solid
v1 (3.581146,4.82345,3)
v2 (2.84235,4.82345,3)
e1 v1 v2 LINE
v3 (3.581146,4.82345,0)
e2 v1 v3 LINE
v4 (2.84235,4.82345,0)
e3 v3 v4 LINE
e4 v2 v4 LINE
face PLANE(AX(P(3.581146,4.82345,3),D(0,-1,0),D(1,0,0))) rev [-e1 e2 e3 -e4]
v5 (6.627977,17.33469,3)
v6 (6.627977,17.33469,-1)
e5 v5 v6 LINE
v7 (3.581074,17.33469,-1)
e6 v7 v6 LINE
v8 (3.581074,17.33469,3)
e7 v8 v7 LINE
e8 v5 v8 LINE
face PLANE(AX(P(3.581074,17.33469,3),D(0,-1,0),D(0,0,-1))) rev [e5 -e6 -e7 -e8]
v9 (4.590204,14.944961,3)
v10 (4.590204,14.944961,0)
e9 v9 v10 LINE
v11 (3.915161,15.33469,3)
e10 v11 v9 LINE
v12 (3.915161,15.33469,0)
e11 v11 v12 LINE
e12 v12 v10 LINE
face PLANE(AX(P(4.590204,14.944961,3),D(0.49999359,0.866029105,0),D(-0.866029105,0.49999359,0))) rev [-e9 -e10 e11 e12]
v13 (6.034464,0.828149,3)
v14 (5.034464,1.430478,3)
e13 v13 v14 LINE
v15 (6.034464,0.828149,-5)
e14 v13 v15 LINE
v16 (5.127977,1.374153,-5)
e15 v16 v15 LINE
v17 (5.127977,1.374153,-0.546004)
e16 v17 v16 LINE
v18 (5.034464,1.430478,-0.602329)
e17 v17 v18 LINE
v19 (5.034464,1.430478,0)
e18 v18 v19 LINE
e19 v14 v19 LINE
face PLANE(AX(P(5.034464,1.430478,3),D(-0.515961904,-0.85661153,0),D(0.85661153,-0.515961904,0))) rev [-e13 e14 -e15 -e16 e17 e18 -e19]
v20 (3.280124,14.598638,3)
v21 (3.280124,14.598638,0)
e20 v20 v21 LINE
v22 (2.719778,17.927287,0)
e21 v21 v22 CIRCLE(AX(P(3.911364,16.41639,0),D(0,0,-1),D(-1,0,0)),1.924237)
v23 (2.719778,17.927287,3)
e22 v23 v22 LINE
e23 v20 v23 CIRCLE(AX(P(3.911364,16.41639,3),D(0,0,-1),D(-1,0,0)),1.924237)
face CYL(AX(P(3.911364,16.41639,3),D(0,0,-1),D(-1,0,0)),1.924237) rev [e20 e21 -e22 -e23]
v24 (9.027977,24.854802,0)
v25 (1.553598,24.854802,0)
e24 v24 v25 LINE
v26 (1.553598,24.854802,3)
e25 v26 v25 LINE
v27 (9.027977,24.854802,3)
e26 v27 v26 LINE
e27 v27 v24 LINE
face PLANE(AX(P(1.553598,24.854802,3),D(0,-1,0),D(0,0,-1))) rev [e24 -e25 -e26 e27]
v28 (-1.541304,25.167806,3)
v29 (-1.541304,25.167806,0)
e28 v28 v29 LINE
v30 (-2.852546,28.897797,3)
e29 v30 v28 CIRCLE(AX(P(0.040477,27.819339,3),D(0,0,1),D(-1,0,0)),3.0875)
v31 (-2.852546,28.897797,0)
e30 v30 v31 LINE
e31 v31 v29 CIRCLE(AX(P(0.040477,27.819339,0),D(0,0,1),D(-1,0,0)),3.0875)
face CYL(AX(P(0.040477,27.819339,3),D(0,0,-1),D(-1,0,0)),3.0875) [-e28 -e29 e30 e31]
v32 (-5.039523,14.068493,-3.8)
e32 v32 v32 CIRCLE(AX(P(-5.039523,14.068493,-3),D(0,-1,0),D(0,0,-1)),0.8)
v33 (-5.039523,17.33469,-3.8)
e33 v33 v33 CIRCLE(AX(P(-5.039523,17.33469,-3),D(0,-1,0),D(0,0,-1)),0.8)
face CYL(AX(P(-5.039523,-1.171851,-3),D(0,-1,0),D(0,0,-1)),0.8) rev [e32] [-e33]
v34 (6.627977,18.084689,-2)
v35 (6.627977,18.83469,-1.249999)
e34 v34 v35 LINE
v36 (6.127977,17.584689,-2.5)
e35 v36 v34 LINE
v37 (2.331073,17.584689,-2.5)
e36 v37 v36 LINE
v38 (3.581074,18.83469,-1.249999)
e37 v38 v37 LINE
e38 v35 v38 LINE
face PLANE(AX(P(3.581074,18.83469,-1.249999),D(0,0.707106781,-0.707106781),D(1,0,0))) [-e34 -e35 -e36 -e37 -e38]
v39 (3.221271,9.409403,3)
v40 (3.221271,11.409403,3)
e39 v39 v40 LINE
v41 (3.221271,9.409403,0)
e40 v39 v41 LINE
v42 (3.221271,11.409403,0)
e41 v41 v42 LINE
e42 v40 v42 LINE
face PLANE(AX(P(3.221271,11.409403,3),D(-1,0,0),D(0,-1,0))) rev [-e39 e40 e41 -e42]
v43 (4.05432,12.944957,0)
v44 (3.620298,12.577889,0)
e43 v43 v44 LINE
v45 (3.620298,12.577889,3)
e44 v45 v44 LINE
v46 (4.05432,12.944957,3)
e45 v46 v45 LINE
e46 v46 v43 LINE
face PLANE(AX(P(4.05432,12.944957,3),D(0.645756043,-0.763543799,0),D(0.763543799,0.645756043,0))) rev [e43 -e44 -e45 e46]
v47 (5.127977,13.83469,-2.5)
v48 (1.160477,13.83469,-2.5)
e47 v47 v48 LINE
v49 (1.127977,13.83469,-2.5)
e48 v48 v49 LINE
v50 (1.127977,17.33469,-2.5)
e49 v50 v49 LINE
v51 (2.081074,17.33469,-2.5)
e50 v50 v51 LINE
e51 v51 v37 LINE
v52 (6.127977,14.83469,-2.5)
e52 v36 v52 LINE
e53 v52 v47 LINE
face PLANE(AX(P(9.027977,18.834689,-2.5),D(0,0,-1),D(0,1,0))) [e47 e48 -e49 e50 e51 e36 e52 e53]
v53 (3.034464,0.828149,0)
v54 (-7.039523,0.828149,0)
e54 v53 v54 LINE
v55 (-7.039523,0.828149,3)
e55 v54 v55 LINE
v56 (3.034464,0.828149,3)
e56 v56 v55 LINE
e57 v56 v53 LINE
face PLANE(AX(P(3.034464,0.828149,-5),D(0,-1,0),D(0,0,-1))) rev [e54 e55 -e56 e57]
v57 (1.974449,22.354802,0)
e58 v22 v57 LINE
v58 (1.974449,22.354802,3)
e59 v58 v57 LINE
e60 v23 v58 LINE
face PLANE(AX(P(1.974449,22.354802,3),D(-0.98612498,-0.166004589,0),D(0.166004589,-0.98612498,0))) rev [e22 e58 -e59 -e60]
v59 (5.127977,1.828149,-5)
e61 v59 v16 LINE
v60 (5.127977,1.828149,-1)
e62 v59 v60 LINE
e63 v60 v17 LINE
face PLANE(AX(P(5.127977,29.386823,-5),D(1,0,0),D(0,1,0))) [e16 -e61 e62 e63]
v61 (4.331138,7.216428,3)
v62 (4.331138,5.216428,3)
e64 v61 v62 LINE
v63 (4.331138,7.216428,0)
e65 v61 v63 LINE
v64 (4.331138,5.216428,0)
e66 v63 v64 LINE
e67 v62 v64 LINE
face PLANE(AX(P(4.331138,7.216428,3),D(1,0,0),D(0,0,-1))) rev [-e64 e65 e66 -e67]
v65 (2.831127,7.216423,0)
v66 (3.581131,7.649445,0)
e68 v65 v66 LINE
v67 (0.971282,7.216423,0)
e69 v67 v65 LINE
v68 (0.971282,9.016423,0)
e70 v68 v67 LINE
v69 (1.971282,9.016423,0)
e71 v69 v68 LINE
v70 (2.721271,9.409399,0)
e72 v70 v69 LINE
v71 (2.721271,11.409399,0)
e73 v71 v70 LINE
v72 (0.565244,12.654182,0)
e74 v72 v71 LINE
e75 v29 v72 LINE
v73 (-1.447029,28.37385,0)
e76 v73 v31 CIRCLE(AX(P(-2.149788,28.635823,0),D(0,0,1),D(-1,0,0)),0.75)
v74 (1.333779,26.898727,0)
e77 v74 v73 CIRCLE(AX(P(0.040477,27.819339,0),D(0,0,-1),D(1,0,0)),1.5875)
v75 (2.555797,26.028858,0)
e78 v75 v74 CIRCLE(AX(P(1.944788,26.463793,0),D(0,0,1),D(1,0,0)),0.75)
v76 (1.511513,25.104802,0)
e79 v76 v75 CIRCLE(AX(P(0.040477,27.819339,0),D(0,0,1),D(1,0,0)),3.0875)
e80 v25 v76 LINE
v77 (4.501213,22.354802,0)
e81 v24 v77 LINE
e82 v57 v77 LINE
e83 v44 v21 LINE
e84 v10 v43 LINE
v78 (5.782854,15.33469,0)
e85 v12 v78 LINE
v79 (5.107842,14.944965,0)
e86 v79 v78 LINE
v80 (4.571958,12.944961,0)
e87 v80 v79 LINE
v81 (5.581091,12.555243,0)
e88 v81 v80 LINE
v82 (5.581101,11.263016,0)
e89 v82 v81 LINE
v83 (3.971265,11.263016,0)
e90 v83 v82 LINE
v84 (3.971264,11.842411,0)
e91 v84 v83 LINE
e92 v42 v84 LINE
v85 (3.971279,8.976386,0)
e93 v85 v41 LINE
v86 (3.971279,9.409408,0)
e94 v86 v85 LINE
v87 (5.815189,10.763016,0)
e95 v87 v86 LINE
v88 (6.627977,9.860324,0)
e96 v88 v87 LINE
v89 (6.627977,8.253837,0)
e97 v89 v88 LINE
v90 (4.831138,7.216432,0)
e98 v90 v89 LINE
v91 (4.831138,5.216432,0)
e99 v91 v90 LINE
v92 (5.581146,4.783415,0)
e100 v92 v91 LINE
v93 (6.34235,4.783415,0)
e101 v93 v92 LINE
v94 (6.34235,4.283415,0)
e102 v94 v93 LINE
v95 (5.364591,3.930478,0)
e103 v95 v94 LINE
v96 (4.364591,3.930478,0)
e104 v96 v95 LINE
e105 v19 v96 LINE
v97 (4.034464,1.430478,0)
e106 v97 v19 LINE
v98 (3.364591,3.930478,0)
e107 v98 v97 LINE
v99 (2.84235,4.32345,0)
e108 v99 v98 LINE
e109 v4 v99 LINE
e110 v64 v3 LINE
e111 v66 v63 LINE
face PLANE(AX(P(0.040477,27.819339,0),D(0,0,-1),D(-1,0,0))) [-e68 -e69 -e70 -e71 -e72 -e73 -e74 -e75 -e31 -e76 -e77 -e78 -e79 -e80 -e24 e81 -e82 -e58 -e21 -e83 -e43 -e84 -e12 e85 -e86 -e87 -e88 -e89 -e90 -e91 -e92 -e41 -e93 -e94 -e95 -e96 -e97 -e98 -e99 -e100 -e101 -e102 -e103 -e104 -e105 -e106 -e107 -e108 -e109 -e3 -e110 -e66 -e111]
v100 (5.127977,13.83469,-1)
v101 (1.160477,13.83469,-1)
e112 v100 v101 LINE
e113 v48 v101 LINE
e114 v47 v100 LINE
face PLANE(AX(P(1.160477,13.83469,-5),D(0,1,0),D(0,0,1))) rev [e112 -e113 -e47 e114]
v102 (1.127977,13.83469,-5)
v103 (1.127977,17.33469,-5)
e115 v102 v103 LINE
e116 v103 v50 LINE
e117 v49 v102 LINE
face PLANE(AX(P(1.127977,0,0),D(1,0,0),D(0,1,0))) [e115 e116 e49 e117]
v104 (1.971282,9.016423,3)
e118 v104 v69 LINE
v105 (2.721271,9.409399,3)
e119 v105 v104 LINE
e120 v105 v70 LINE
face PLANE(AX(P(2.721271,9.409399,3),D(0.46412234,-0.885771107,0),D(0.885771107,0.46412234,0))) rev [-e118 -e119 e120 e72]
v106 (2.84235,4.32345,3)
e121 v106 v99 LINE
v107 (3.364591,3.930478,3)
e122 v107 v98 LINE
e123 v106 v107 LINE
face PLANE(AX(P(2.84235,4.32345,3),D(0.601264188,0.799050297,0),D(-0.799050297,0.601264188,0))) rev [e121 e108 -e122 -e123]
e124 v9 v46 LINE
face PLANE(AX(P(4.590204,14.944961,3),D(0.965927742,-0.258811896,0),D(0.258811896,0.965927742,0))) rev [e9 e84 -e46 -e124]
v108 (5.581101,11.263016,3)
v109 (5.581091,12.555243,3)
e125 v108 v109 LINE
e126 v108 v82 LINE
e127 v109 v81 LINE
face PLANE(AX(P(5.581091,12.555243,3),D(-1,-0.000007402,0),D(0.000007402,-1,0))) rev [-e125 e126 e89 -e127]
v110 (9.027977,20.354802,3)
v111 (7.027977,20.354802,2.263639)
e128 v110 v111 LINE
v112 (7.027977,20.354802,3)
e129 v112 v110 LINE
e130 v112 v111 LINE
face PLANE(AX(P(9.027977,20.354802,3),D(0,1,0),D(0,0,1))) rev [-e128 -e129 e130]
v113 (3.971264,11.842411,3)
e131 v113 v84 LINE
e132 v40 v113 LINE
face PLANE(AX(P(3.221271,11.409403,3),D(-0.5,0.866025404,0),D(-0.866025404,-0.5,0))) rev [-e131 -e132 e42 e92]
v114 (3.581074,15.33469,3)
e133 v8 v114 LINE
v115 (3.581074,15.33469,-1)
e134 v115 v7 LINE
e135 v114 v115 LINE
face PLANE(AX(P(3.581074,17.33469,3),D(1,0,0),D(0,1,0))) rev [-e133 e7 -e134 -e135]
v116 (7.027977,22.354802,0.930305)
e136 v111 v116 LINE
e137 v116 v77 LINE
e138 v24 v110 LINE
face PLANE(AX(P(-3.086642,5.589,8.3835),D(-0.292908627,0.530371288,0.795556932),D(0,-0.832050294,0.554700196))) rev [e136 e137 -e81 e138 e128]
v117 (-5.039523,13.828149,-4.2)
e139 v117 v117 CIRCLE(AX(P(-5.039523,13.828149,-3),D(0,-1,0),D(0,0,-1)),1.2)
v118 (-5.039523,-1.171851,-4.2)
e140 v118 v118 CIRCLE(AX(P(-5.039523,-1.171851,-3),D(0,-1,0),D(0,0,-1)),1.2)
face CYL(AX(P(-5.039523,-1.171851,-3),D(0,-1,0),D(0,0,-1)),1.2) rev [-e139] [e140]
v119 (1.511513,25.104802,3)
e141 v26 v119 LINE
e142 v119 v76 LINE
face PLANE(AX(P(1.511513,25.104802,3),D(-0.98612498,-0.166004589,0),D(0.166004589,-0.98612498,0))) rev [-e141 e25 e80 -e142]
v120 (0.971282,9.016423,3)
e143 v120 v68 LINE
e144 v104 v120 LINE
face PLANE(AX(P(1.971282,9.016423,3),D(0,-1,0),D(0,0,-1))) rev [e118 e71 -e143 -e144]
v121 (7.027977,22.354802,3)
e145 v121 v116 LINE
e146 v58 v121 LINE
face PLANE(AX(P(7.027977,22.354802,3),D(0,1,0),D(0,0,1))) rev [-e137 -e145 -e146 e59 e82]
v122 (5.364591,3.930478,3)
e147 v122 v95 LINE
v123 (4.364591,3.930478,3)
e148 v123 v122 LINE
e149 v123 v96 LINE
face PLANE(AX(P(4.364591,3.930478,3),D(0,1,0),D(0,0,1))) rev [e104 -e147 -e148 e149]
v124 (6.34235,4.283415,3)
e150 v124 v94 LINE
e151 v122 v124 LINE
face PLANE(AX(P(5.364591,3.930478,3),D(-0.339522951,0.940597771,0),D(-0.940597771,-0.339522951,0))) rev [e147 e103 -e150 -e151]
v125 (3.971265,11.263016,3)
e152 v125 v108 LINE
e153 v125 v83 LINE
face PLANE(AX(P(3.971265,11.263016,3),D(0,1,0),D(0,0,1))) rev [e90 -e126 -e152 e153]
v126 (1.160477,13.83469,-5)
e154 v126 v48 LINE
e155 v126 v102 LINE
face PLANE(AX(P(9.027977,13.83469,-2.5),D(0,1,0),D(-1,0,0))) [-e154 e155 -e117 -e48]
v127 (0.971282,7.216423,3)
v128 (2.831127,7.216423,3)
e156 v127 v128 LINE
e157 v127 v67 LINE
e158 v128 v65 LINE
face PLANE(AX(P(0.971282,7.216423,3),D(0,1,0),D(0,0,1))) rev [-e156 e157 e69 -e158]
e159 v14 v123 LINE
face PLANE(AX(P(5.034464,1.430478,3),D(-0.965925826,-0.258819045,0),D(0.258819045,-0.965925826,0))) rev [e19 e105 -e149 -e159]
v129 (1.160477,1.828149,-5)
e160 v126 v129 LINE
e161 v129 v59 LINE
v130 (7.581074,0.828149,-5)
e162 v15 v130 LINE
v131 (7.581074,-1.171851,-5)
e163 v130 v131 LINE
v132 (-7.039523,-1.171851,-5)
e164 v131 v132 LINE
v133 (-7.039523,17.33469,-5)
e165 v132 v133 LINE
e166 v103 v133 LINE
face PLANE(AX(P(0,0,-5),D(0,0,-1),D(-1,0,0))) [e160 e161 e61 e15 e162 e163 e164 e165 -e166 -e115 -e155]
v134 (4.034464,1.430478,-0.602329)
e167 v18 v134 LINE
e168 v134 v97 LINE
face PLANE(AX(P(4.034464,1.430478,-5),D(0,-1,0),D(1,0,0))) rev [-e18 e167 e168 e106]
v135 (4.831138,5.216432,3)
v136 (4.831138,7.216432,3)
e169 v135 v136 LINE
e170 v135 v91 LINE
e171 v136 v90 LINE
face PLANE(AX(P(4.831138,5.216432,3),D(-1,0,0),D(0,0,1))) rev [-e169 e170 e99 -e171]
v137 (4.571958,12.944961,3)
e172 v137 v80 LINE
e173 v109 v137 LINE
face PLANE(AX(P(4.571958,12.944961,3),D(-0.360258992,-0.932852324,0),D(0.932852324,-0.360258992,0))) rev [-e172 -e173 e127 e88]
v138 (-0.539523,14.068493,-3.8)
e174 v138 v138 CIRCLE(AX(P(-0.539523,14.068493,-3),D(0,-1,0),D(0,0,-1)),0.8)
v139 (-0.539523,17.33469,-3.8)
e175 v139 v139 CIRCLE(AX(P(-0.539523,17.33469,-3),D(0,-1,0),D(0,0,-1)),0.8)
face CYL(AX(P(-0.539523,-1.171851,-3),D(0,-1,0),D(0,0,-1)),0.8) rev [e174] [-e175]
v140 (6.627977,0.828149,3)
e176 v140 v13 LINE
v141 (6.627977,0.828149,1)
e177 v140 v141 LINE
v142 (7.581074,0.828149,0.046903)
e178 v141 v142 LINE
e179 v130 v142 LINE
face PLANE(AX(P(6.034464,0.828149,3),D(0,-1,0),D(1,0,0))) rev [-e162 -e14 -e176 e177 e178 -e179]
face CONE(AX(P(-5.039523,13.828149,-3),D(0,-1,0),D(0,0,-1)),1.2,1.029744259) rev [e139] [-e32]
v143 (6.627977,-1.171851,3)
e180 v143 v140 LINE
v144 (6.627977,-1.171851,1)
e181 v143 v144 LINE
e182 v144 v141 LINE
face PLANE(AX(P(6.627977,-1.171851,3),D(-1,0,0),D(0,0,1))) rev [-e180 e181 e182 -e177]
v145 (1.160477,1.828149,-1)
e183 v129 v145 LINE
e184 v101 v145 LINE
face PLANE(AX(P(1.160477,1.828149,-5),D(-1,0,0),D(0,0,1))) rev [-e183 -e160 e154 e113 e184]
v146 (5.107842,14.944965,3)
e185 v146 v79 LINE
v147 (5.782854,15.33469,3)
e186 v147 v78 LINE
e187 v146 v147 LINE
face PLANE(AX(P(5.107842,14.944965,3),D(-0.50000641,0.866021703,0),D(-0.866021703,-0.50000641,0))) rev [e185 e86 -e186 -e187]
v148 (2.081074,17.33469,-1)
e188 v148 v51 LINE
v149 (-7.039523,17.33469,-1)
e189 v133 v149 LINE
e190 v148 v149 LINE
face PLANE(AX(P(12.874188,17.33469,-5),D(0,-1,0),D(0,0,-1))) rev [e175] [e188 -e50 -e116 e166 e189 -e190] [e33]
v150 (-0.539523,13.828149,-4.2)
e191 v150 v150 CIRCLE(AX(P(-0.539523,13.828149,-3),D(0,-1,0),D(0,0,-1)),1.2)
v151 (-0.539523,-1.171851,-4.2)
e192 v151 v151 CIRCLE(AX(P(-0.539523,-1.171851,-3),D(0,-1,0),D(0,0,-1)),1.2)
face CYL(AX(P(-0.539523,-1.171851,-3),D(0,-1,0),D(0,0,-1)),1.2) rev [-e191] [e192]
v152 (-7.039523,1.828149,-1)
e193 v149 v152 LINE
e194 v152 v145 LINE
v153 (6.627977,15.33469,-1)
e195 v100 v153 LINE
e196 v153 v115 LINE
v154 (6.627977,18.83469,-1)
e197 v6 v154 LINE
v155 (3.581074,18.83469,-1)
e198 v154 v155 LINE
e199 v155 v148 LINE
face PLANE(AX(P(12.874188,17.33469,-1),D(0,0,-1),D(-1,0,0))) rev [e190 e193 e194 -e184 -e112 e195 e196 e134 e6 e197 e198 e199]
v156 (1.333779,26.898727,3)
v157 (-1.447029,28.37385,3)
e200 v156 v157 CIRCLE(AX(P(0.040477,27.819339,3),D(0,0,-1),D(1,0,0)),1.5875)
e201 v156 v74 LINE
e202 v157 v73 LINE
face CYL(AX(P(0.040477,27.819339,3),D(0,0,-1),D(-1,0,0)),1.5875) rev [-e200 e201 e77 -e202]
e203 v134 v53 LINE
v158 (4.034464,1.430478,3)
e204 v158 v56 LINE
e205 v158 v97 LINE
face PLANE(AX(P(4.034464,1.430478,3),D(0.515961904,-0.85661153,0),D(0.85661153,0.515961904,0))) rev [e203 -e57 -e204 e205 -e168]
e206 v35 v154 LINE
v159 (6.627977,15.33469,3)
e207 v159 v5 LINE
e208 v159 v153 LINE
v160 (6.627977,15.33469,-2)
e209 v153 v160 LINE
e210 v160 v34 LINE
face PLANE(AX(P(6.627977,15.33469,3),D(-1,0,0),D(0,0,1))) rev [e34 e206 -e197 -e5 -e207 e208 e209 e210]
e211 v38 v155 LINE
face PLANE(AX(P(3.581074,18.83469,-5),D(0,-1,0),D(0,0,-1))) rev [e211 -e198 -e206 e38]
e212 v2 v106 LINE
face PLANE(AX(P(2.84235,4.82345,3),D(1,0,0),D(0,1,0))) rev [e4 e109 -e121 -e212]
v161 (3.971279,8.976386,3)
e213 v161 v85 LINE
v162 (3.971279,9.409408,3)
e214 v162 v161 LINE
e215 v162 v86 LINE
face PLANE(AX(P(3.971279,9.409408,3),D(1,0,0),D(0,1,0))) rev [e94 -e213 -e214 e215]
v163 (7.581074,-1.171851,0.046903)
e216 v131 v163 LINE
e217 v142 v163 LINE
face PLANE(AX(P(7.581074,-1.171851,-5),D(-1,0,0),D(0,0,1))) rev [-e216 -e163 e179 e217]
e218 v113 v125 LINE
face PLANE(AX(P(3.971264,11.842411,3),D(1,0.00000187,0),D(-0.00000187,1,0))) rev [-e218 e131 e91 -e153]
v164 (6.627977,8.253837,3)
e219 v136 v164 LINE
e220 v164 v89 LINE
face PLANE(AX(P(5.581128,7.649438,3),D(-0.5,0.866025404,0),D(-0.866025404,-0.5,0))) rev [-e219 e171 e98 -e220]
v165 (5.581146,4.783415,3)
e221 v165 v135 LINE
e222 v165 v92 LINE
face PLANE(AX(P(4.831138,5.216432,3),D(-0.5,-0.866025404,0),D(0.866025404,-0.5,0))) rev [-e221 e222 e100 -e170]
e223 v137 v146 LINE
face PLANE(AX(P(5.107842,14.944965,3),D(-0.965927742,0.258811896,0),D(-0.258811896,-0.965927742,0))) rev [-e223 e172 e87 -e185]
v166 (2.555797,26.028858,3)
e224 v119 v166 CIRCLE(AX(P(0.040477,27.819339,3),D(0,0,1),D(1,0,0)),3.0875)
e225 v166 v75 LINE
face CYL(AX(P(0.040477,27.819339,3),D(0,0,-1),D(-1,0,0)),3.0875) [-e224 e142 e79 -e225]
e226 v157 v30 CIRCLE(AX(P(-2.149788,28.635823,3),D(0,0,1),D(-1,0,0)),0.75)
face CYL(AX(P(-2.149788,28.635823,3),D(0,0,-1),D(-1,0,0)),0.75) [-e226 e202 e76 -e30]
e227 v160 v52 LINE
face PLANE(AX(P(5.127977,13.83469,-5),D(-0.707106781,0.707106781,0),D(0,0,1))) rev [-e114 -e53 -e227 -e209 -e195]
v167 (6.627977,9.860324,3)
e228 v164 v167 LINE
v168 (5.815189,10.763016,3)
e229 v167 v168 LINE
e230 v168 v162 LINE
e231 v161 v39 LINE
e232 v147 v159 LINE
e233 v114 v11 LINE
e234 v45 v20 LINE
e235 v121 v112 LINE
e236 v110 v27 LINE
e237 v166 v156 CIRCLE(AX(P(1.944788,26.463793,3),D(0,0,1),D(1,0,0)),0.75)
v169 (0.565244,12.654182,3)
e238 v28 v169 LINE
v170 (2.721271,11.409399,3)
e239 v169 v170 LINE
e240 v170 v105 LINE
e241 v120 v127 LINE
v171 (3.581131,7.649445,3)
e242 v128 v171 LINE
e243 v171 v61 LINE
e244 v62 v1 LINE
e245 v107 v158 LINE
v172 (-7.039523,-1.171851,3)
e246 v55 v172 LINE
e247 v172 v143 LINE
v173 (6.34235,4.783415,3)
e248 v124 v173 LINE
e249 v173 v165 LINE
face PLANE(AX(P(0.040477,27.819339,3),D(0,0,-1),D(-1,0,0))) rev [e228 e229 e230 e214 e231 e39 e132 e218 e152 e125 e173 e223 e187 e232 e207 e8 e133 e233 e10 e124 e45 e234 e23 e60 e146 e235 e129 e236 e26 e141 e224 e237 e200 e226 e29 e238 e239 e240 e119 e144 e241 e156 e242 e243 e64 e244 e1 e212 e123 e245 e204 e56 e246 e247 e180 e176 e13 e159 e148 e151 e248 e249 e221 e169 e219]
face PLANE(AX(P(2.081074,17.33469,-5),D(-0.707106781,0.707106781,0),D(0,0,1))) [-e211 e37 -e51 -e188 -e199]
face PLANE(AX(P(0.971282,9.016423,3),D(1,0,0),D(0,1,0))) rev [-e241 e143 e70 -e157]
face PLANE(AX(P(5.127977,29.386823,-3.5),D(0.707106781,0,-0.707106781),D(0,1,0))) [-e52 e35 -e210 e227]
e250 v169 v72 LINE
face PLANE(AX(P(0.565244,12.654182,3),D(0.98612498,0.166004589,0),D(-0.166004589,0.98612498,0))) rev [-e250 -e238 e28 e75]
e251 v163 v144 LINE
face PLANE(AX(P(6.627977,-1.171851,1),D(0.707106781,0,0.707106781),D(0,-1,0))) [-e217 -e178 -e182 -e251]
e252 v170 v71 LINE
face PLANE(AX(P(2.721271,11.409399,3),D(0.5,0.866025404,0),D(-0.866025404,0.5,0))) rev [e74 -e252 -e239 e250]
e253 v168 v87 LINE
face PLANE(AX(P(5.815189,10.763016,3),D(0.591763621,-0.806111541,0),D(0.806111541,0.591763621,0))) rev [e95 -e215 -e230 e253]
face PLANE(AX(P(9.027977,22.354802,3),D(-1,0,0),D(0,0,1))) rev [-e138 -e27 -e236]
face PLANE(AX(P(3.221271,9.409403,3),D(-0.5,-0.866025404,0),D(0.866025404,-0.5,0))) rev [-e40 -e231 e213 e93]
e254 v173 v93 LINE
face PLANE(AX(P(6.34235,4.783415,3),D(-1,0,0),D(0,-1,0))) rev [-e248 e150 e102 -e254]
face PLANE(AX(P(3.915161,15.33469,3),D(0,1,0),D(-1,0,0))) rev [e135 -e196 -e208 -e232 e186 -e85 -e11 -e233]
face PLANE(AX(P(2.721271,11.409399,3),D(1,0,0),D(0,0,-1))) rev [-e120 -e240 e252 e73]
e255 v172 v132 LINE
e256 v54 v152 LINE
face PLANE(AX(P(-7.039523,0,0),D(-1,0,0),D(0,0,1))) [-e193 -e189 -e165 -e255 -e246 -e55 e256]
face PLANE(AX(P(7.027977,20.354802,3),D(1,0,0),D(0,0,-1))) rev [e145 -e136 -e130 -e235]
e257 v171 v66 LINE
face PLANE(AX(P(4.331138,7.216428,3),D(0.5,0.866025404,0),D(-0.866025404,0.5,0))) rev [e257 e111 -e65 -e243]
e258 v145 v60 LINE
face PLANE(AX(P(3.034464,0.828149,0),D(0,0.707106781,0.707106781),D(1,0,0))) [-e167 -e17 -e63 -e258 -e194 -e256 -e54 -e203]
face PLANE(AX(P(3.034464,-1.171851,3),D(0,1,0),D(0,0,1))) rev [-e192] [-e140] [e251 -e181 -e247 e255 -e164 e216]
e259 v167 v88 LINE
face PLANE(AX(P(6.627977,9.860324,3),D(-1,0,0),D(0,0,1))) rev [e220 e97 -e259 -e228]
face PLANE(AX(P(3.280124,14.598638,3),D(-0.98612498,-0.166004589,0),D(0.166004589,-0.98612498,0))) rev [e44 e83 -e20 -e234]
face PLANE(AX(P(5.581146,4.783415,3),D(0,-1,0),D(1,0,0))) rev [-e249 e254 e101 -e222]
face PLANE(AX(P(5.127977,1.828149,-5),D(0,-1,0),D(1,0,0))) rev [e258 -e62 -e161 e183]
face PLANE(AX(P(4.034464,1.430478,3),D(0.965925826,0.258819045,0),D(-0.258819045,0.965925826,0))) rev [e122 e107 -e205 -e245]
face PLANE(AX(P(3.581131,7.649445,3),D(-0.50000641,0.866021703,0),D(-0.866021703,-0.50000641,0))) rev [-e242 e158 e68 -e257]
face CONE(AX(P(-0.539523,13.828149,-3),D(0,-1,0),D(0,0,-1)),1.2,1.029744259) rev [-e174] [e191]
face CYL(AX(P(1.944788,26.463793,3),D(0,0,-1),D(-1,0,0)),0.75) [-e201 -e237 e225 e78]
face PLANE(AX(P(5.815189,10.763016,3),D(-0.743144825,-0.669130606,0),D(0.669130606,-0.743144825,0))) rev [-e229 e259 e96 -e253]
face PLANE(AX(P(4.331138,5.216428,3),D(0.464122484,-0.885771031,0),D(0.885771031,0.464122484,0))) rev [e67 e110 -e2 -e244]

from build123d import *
from OCP.BRepAlgoAPI import BRepAlgoAPI_Cut
from OCP.TopTools import TopTools_ListOfShape

# Parameters (mm, degrees)
BOSS_SWITCH_BODY_DEPTH                    = 3
SKETCH1_W                                 = 4
SKETCH1_H                                 = 3.5
BOSS_FLANGE_WIDTH_DEPTH                   = 5
BOSS_FLANGE_HEIGHT_REACH                  = 35.863
SKETCH2_W                                 = 4
SKETCH2_H                                 = 2
SKETCH2_W_2                               = 8
CUT_UP_TO_DOWN_DERAILLEUR_CLEARANCE_REACH = 21.467
SKETCH10_W                                = 2.453096586
SKETCH10_H                                = 3
SKETCH17_W                                = 12.1675
SKETCH17_H                                = 4
BOSS_FLANGE_SUPPORT_DEPTH                 = 14.506540875
TAP_DRILL_FOR_M2X0_4_TAP1_D               = 1.6
M2_CLEARANCE_HOLE2_D                      = 2.4
M2_CLEARANCE_HOLE2_DEPTH                  = 15
M2_CLEARANCE_HOLE2_TIP                    = 0.721032743
CHAMFER_FLANGE_SUPPORT_SIZE               = 1.5
CHAMFER_FLANGE_SUPPORT_2_SIZE             = 1.5
CHAMFER_FLANGE_SUPPORT_3_SIZE             = 1
SKETCH23_W                                = 3.9675
SKETCH23_H                                = 12.006540875
CUT_GAP_FOR_PRINTING_DEPTH                = 32.000499688
SKETCH25_W                                = 0.953096586
SKETCH25_H                                = 3.5
CUT_DERAILLEUR_CLEARANCE_DEPTH            = 32.145320369
CHAMFER8_SIZE                             = 1
CUT_UP_TO_DOWN_CANTILEVER_SLOPE_REACH     = 31.869
SKETCH26_W                                = 12.477246204
SKETCH26_H                                = 5.771077126
CUT_WIDE_DERAILLEUR_CLEARANCE_DEPTH       = 33.195879702
CUT_WIDE_DERAILLEUR_CLEARANCE_DEPTH_BACK  = 4
SKETCH27_W                                = 2.5
SKETCH27_H                                = 4.999999471
CHAMFER9_SIZE                             = 1.25
SKETCH28_W                                = 3.046903414
SKETCH28_H                                = 1.5
CUT_EXTRUDE1_DEPTH                        = 1


# Some blends are built 0.0001 mm under size
with BuildPart() as part:
    # Sketch-SwitchBossUp → Boss-Switch Body (new body)
    with BuildSketch(Plane.XY):
        with BuildLine():
            Line((5.581091201, 12.555242641), (5.581100766, 11.263016279))
            Line((5.581100766, 11.263016279), (3.971265023, 11.263016279))
            Line((3.971265023, 11.263016279), (3.97126394, 11.842410935))
            Line((3.97126394, 11.842410935), (3.221271341, 11.409402506))
            Line((3.221271341, 11.409402506), (3.221271341, 9.409402506))
            Line((3.221271341, 9.409402506), (3.971278743, 8.976385531))
            Line((3.971278743, 8.976385531), (3.971278743, 9.409408058))
            Line((3.971278743, 9.409408058), (5.815189336, 10.763016279))
            Line((5.815189336, 10.763016279), (6.627976927, 9.860324207))
            Line((6.627976927, 9.860324207), (6.627976927, 8.253837221))
            Line((6.627976927, 8.253837221), (5.581127512, 7.649438429))
            Line((5.581127512, 7.649438429), (4.831138119, 7.216431851))
            Line((4.831138119, 7.216431851), (4.831138119, 5.216431851))
            Line((4.831138119, 5.216431851), (5.58114552, 4.783414875))
            Line((5.58114552, 4.783414875), (6.342350466, 4.783414875))
            Line((6.342350466, 4.783414875), (6.342350466, 4.283414875))
            Line((6.342350466, 4.283414875), (5.364591217, 3.930477929))
            Line((5.364591217, 3.930477929), (4.364591217, 3.930477929))
            Line((4.364591217, 3.930477929), (5.034464198, 1.430477929))
            Line((5.034464198, 1.430477929), (6.034464198, 0.828149001))
            Line((6.034464198, 0.828149001), (6.627976927, 0.828149001))
            Line((6.627976927, 0.828149001), (6.627976927, -1.171850999))
            Line((6.627976927, -1.171850999), (5.034464198, -1.171850999))
            Line((5.034464198, -1.171850999), (3.034464198, -1.171850999))
            Line((3.034464198, -1.171850999), (3.034464198, 0.828149001))
            Line((3.034464198, 0.828149001), (4.034464198, 1.430477929))
            Line((4.034464198, 1.430477929), (3.364591217, 3.930477929))
            Line((3.364591217, 3.930477929), (2.842350466, 4.323450264))
            Line((2.842350466, 4.323450264), (2.842350466, 4.823450264))
            Line((2.842350466, 4.823450264), (3.58114552, 4.823450264))
            Line((3.58114552, 4.823450264), (4.331138119, 5.21642815))
            Line((4.331138119, 5.21642815), (4.331138119, 7.21642815))
            Line((4.331138119, 7.21642815), (3.581130717, 7.649445125))
            Line((3.581130717, 7.649445125), (2.83112652, 7.216422599))
            Line((2.83112652, 7.216422599), (0.971281652, 7.216422599))
            Line((0.971281652, 7.216422599), (0.971281652, 9.016422599))
            Line((0.971281652, 9.016422599), (1.971281652, 9.016422599))
            Line((1.971281652, 9.016422599), (2.721271341, 9.409398805))
            Line((2.721271341, 9.409398805), (2.721271341, 11.409398805))
            Line((2.721271341, 11.409398805), (1.688483029, 12.005679416))
            Line((1.688483029, 12.005679416), (0.565243661, 12.654181967))
            Line((0.565243661, 12.654181967), (-1.541303694, 25.167805745))
            ThreePointArc((-1.541303694, 25.167805745), (-2.872284003, 26.795385437), (-2.852546321, 28.897797067))
            ThreePointArc((-2.852546321, 28.897797067), (-1.887813913, 29.338582026), (-1.447028953, 28.373849618))
            ThreePointArc((-1.447028953, 28.373849618), (-0.703448682, 26.416936722), (1.333779254, 26.898727173))
            ThreePointArc((1.333779254, 26.898727173), (2.379722745, 27.074801628), (2.555797201, 26.028858137))
            ThreePointArc((2.555797201, 26.028858137), (2.086504637, 25.507104397), (1.511513111, 25.104801997))
            Line((1.511513111, 25.104801997), (1.553598189, 24.854801997))
            Line((1.553598189, 24.854801997), (9.027976927, 24.854801997))
            Line((9.027976927, 24.854801997), (9.027976927, 22.354801997))
            Line((9.027976927, 22.354801997), (9.027976927, 20.354801997))
            Line((9.027976927, 20.354801997), (7.027976927, 20.354801997))
            Line((7.027976927, 20.354801997), (7.027976927, 22.354801997))
            Line((7.027976927, 22.354801997), (1.974448974, 22.354801997))
            Line((1.974448974, 22.354801997), (2.719778232, 17.927287042))
            ThreePointArc((2.719778232, 17.927287042), (2.013826204, 16.096957693), (3.280124137, 14.598637521))
            Line((3.280124137, 14.598637521), (3.620297651, 12.577888564))
            Line((3.620297651, 12.577888564), (4.054320079, 12.944956709))
            Line((4.054320079, 12.944956709), (4.59020366, 14.944960676))
            Line((4.59020366, 14.944960676), (3.915161346, 15.334689876))
            Line((3.915161346, 15.334689876), (3.581073513, 15.334689876))
            Line((3.581073513, 15.334689876), (3.581073513, 17.334689876))
            Line((3.581073513, 17.334689876), (5.725580434, 17.334689876))
            Line((5.725580434, 17.334689876), (6.627976927, 17.334689876))
            Line((6.627976927, 17.334689876), (6.627976927, 15.334689876))
            Line((6.627976927, 15.334689876), (5.782854352, 15.334689876))
            Line((5.782854352, 15.334689876), (5.107841751, 14.944964507))
            Line((5.107841751, 14.944964507), (4.571958169, 12.944960541))
            Line((4.571958169, 12.944960541), (5.581091201, 12.555242641))
        make_face()
    extrude(amount=BOSS_SWITCH_BODY_DEPTH)

    # Sketch1 → Boss-Flange Width (add)
    with BuildSketch(Plane(origin=(0, 0, 0), x_dir=(-1, 0, 0), z_dir=(0, 0, -1))):
        Polygon((-7.581073513, -1.171850999), (0.412170615, -1.171850999), (0.412170615, 0.828149001), (-3.034464198, 0.828149001), (-4.034464198, 1.430477929), (-5.034464198, 1.430477929), (-6.034464198, 0.828149001), (-7.581073513, 0.828149001), align=None)
        with Locations((-5.581073513, 17.084689876)):
            Rectangle(SKETCH1_W, SKETCH1_H)
    extrude(amount=BOSS_FLANGE_WIDTH_DEPTH)

    # Sketch2 → Boss-Flange Height (add, up to next)
    with BuildSketch(Plane(origin=(-7.039523073, 0, 0), x_dir=(0, 0, -1), z_dir=(1, 0, 0)), mode=Mode.PRIVATE) as boss_flange_height_sk1:
        with Locations((3, 16.334689876)):
            Rectangle(SKETCH2_W, SKETCH2_H)
    boss_flange_height_tool1 = extrude(boss_flange_height_sk1.sketch, amount=BOSS_FLANGE_HEIGHT_REACH, mode=Mode.PRIVATE) - part.part
    # Sketch2 → Boss-Flange Height (add, up to next)
    with BuildSketch(Plane(origin=(-7.039523073, 0, 0), x_dir=(0, 0, -1), z_dir=(1, 0, 0)), mode=Mode.PRIVATE) as boss_flange_height_sk2:
        with Locations((1, -0.171850999)):
            Rectangle(SKETCH2_W_2, SKETCH2_H)
    boss_flange_height_tool2 = extrude(boss_flange_height_sk2.sketch, amount=BOSS_FLANGE_HEIGHT_REACH, mode=Mode.PRIVATE) - part.part
    add(boss_flange_height_tool1.solids().sort_by_distance((-7.039523, 16.33469, -3))[0])
    add(boss_flange_height_tool2.solids().sort_by_distance((-7.039523, -0.171851, -1))[0])

    # Sketch10 → Cut-Up-To-Down Derailleur Clearance (cut, up to next)
    with BuildSketch(Plane(origin=(0, 15.334689876, 0), x_dir=(1, 0, 0), z_dir=(0, 1, 0)), mode=Mode.PRIVATE) as cut_up_to_down_derailleur_clearance_sk1:
        with Locations((6.35452522, 3.5)):
            Rectangle(SKETCH10_W, SKETCH10_H)
    cut_up_to_down_derailleur_clearance_tool1 = extrude(cut_up_to_down_derailleur_clearance_sk1.sketch, amount=CUT_UP_TO_DOWN_DERAILLEUR_CLEARANCE_REACH, mode=Mode.PRIVATE) & part.part
    add(cut_up_to_down_derailleur_clearance_tool1.solids().sort_by_distance((6.354525, 15.33469, -3.5))[0], mode=Mode.SUBTRACT)

    # Sketch17 → Boss-Flange Support (add)
    with BuildSketch(Plane.XZ.offset(-15.334689876)):
        with Locations((-0.955773073, -3)):
            Rectangle(SKETCH17_W, SKETCH17_H)
    extrude(amount=BOSS_FLANGE_SUPPORT_DEPTH)

    # Tap Drill for M2x0.4 Tap1 (through all)
    with Locations(Plane(origin=(0, -1.171850999, 0), x_dir=(-1, 0, 0), z_dir=(0, -1, 0))):
        with Locations((5.039523073, 3), (0.539523073, 3)):
            Hole(TAP_DRILL_FOR_M2X0_4_TAP1_D / 2)

    # M2 Clearance Hole2
    with Locations(Plane.XZ.offset(1.171850999)):
        with Locations((-5.039523073, -3), (-0.539523073, -3)):
            Hole(M2_CLEARANCE_HOLE2_D / 2, depth=M2_CLEARANCE_HOLE2_DEPTH)
            with Locations((0, 0, -(M2_CLEARANCE_HOLE2_DEPTH + M2_CLEARANCE_HOLE2_TIP / 2))):  # 118° drill point
                Cone(0, M2_CLEARANCE_HOLE2_D / 2, M2_CLEARANCE_HOLE2_TIP, mode=Mode.SUBTRACT)

    # Chamfer-Flange Support
    chamfer_flange_support_edges = [part.edges().sort_by_distance(p)[0] for p in [
        (3.581073513, 17.334689876, -3),
    ]]
    chamfer(chamfer_flange_support_edges, length=CHAMFER_FLANGE_SUPPORT_SIZE - 0.0001)  # a hair under: the kernel refuses the full size

    # Chamfer-Flange Support 2
    chamfer_flange_support_2_edges = [part.edges().sort_by_distance(p)[0] for p in [
        (5.127976927, 17.084689876, -2),
        (5.127976927, 15.334689876, -1.5),
    ]]
    chamfer(chamfer_flange_support_2_edges, length=CHAMFER_FLANGE_SUPPORT_2_SIZE)

    # Chamfer-Flange Support 3
    chamfer_flange_support_3_edges = [part.edges().sort_by_distance(p)[0] for p in [
        (-2.002529437, 0.828149001, -1),
    ]]
    chamfer(chamfer_flange_support_3_edges, length=CHAMFER_FLANGE_SUPPORT_3_SIZE)

    # Sketch23 → Cut-Gap for Printing (cut, through all)
    with BuildSketch(Plane.XY.offset(-1)):
        with Locations((3.144226927, 7.831419439)):
            Rectangle(SKETCH23_W, SKETCH23_H)
    extrude(amount=-CUT_GAP_FOR_PRINTING_DEPTH, mode=Mode.SUBTRACT)

    # Sketch25 → Cut-Derailleur Clearance (cut, through all)
    with BuildSketch(Plane.XY):
        with Locations((7.10452522, 17.084689876)):
            Rectangle(SKETCH25_W, SKETCH25_H)
    extrude(amount=-CUT_DERAILLEUR_CLEARANCE_DEPTH, mode=Mode.SUBTRACT)

    # Chamfer8
    # the kernel refuses this chamfer: 1 mm, written as the material it adds along each edge
    with BuildSketch(Plane(origin=(6.627976927, 0.828149001, 0), x_dir=(1, 0, 0), z_dir=(0, -1, 0))) as chamfer8_piece_1_section:
        Polygon((CHAMFER8_SIZE, 0), (0, CHAMFER8_SIZE), (0, 0), align=None)
    chamfer8_piece_1 = extrude(amount=2, mode=Mode.PRIVATE)
    chamfer8_piece_1 = split(chamfer8_piece_1, bisect_by=Plane(origin=(7.581073513, 0.828149001, 0), z_dir=(-1, 0, 0)), keep=Keep.TOP, mode=Mode.PRIVATE)
    add(chamfer8_piece_1)

    # Sketch26 → Cut-Up-to-Down Cantilever Slope (cut, up to next)
    with BuildSketch(Plane(origin=(-3.086642121, 5.589000146, 8.383500218), x_dir=(-0.9561404375276108, -0.1624764728289173, -0.24371470924337582), z_dir=(0.2929086269205964, -0.5303712883154423, -0.795556932473163)), mode=Mode.PRIVATE) as cut_up_to_down_cantilever_slope_sk1:
        with Locations((-13.791615152, 17.794906754)):
            Rectangle(SKETCH26_W, SKETCH26_H)
    cut_up_to_down_cantilever_slope_tool1 = extrude(cut_up_to_down_cantilever_slope_sk1.sketch, amount=CUT_UP_TO_DOWN_CANTILEVER_SLOPE_REACH, mode=Mode.PRIVATE) & part.part
    add(cut_up_to_down_cantilever_slope_tool1.solids().sort_by_distance((10.100079, 22.636071, 1.873881))[0], mode=Mode.SUBTRACT)


with BuildPart() as cut_wide_derailleur_clearance_tool:
    # Sketch27 → Cut-Wide Derailleur Clearance (new, two sides: drawn at the far end of the back side and taken through both)
    with BuildSketch(Plane(origin=(5.127976927, 0, 0), x_dir=(0, 0, -1), z_dir=(1, 0, 0)).offset(-CUT_WIDE_DERAILLEUR_CLEARANCE_DEPTH_BACK)):
        with Locations((3.75, 16.334689611)):
            Rectangle(SKETCH27_W, SKETCH27_H)
    extrude(amount=CUT_WIDE_DERAILLEUR_CLEARANCE_DEPTH + CUT_WIDE_DERAILLEUR_CLEARANCE_DEPTH_BACK)


with BuildPart() as part_1:
    add(part.part)

    # Cut-Wide Derailleur Clearance: cut by cut_wide_derailleur_clearance_tool, with a tolerance
    cut_wide_derailleur_clearance_stock = TopTools_ListOfShape()
    cut_wide_derailleur_clearance_stock.Append(part_1.part.wrapped)
    cut_wide_derailleur_clearance_tools = TopTools_ListOfShape()
    cut_wide_derailleur_clearance_tools.Append(cut_wide_derailleur_clearance_tool.part.wrapped)
    cut_wide_derailleur_clearance_cut = BRepAlgoAPI_Cut()
    cut_wide_derailleur_clearance_cut.SetArguments(cut_wide_derailleur_clearance_stock)
    cut_wide_derailleur_clearance_cut.SetTools(cut_wide_derailleur_clearance_tools)
    cut_wide_derailleur_clearance_cut.SetFuzzyValue(0.00001)
    cut_wide_derailleur_clearance_cut.Build()
    add(Compound.cast(cut_wide_derailleur_clearance_cut.Shape()).solids(), mode=Mode.REPLACE)

    # Chamfer9
    chamfer9_edges = [part_1.edges().sort_by_distance(p)[0] for p in [
        (4.85452522, 18.834689347, -2.5),
    ]]
    chamfer(chamfer9_edges, length=CHAMFER9_SIZE)

    # Sketch28 → Cut-Extrude1 (cut)
    with BuildSketch(Plane.XY.offset(-1)):
        with Locations((5.10452522, 18.084689876)):
            Rectangle(SKETCH28_W, SKETCH28_H)
    extrude(amount=CUT_EXTRUDE1_DEPTH, mode=Mode.SUBTRACT)


solid = part_1.part
